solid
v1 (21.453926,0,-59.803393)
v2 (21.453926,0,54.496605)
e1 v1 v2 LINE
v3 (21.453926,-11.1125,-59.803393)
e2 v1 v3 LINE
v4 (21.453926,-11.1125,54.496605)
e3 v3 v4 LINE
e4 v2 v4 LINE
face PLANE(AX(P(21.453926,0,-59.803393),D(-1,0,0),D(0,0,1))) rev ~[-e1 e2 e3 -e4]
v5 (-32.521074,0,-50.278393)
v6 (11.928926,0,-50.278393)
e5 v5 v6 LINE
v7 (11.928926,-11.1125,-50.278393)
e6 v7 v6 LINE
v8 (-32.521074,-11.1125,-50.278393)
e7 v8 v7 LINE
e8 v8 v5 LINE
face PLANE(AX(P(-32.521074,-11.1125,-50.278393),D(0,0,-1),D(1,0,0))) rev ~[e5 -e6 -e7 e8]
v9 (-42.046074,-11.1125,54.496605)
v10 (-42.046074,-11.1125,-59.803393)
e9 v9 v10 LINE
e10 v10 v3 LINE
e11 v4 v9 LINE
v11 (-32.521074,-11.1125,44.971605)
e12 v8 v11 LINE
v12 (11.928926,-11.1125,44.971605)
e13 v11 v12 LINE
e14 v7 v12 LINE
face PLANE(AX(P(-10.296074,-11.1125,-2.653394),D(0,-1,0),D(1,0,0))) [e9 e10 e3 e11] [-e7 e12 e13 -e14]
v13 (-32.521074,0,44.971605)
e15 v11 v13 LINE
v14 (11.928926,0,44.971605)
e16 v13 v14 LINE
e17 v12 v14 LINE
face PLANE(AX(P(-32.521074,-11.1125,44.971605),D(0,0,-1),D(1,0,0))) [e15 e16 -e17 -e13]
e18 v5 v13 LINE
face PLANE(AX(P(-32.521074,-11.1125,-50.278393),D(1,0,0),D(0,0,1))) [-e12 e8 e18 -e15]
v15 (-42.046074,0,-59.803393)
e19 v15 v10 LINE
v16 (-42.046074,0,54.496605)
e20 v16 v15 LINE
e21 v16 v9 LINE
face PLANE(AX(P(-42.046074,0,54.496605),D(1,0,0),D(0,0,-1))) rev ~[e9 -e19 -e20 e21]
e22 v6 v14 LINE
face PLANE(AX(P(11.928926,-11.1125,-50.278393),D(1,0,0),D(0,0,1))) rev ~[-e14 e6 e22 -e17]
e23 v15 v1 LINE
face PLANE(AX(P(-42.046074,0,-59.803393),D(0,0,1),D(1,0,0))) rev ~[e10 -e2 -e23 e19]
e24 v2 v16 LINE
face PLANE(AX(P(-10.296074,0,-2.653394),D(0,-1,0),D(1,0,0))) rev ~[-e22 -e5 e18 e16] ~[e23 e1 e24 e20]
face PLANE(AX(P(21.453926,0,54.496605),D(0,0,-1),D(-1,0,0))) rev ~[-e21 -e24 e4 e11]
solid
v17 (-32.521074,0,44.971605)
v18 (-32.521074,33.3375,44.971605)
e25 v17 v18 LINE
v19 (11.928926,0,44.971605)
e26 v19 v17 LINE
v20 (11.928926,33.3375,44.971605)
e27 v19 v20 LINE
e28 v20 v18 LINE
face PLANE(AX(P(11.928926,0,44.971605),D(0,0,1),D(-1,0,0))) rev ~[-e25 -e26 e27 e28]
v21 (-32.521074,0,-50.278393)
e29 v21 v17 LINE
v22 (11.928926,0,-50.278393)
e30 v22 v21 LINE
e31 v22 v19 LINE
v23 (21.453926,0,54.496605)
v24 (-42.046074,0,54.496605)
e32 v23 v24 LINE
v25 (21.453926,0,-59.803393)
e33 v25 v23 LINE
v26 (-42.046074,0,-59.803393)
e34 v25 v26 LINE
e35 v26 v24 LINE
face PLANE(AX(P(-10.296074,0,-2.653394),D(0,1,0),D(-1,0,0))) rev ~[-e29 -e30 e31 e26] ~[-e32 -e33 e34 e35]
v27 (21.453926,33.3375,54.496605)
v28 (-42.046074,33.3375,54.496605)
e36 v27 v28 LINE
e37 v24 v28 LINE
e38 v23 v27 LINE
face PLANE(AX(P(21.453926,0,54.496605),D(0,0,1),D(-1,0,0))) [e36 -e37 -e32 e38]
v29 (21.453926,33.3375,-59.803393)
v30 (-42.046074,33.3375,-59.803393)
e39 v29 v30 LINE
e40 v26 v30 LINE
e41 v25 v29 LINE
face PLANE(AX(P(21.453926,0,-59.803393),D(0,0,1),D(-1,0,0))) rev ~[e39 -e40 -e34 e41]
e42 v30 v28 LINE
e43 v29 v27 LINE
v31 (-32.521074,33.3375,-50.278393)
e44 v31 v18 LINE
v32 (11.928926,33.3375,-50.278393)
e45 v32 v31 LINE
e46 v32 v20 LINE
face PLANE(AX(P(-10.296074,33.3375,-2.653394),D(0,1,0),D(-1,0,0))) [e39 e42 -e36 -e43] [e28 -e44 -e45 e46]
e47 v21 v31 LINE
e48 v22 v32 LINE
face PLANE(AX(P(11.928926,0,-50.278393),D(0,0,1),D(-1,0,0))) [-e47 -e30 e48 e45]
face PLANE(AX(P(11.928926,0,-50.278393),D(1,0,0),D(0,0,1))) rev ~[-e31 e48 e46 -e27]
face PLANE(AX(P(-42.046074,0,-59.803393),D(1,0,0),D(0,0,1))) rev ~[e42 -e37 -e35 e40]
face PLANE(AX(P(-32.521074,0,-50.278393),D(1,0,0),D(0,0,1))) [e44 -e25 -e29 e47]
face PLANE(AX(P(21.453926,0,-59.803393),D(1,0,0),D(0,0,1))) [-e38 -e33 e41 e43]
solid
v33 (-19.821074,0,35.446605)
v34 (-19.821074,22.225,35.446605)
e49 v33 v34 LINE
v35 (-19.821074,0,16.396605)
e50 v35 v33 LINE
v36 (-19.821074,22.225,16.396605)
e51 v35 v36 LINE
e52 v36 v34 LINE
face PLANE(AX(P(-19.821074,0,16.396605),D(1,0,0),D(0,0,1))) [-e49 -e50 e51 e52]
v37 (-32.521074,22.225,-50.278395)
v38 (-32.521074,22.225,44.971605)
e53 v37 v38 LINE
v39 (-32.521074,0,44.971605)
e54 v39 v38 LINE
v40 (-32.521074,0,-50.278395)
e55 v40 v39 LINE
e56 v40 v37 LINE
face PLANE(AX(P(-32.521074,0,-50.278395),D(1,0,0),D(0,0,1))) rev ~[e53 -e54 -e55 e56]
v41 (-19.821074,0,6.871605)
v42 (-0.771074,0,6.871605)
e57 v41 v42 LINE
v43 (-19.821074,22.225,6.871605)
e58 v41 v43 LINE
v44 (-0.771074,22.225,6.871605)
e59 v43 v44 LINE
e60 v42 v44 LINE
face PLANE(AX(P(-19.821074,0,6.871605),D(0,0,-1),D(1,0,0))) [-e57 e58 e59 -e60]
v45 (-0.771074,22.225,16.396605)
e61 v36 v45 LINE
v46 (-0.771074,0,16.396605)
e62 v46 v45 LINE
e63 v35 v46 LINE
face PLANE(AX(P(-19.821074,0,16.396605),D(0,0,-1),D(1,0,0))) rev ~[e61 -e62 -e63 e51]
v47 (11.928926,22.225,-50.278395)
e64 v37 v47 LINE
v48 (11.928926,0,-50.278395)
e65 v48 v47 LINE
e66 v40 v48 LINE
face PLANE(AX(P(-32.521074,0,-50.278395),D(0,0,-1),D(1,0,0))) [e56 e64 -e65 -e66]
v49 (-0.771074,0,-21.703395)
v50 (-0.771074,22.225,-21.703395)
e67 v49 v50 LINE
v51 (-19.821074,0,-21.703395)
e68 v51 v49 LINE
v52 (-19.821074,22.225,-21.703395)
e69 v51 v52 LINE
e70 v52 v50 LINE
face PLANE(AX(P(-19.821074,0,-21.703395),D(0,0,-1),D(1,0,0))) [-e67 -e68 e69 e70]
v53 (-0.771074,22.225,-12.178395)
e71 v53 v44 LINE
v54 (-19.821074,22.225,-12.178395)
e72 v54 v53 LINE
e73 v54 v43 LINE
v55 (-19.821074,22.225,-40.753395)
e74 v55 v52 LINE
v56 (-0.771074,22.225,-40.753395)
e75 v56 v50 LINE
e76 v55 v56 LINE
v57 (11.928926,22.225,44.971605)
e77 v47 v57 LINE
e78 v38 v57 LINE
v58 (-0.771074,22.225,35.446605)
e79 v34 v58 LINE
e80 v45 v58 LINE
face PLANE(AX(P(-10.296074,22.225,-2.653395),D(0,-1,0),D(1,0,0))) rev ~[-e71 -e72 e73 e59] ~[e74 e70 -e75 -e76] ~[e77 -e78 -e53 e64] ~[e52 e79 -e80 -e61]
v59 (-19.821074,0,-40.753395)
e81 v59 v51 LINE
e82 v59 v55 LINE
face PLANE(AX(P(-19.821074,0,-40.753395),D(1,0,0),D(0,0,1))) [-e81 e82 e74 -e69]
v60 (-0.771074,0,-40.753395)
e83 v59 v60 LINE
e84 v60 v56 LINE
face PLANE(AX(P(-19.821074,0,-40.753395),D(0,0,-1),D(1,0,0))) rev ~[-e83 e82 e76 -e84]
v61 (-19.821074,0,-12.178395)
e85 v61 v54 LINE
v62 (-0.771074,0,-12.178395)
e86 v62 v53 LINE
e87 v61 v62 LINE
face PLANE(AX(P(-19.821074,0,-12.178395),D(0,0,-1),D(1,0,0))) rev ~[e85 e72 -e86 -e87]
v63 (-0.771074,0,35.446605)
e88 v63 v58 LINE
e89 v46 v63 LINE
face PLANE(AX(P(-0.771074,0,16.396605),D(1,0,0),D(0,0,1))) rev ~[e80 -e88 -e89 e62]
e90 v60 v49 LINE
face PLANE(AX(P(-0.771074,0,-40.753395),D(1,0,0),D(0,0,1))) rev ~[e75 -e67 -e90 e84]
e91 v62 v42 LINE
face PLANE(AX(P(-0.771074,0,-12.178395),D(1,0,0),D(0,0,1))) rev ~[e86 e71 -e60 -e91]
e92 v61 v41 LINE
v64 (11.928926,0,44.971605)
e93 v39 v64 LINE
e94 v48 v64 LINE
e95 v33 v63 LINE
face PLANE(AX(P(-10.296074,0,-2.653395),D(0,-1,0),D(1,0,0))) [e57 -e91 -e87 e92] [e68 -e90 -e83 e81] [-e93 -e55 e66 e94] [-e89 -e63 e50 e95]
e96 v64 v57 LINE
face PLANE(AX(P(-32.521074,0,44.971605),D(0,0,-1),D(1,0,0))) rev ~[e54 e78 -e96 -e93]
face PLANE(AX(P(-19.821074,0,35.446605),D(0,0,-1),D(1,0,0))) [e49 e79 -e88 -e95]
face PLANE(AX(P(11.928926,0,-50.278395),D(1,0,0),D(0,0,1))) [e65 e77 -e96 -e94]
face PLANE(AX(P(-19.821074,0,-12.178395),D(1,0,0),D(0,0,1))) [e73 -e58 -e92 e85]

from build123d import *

# Parameters (mm, degrees)
F0_W     = 44.45
F0_H     = 95.25
F0_W_2   = 19.05
F0_H_2   = 19.05
F1_DEPTH = 22.225
F3_DEPTH = 11.1125
F4_W     = 44.45
F4_H     = 95.2499976873
F5_DEPTH = 11.1125
F6_W     = 63.5
F6_H     = 114.2999976873
F6_W_2   = 44.45
F6_H_2   = 95.2499976873
F7_DEPTH = 33.3375


with BuildPart() as f1:
    # F0 (on Front) → F1 (new body)
    with BuildSketch(Plane.XZ):
        with Locations((-10.2960738242, -2.6533950508)):
            Rectangle(F0_W, F0_H)
        with Locations((-10.2960738242, -31.2283950508)):
            Rectangle(F0_W_2, F0_H_2, mode=Mode.SUBTRACT)
        with Locations((-10.2960738242, -2.6533950508)):
            Rectangle(F0_W_2, F0_H_2, mode=Mode.SUBTRACT)
        with Locations((-10.2960738242, 25.9216049492)):
            Rectangle(F0_W_2, F0_H_2, mode=Mode.SUBTRACT)
    extrude(amount=-F1_DEPTH)


with BuildPart() as f3:
    # F2 (on face) → F3 (new body)
    with BuildSketch(Plane.XZ):
        Polygon((21.4539261758, -59.8033927381), (21.4539261758, -50.2783950508), (21.4539261758, 44.9716049492), (21.4539261758, 54.4966049492), (-42.0460738242, 54.4966049492), (-42.0460738242, 44.9716049492), (-42.0460738242, -50.2783950508), (-42.0460738242, -59.8033927381), align=None)
    extrude(amount=F3_DEPTH)

    # F4 (on face) → F5 (cut)
    with BuildSketch(Plane.XZ.offset(11.1125)):
        with Locations((-10.2960738242, -2.6533938944)):
            Rectangle(F4_W, F4_H)
    extrude(amount=-F5_DEPTH, mode=Mode.SUBTRACT)


with BuildPart() as f7:
    # F6 (on face) → F7 (new body)
    with BuildSketch(Plane(origin=(0, 0, 0), x_dir=(-1, 0, 0), z_dir=(0, 1, 0))):
        with Locations((10.2960738242, -2.6533938944)):
            Rectangle(F6_W, F6_H)
        with Locations((10.2960738242, -2.6533938944)):
            Rectangle(F6_W_2, F6_H_2, mode=Mode.SUBTRACT)
    extrude(amount=F7_DEPTH)


solid = Compound([f1.part, f3.part, f7.part])
